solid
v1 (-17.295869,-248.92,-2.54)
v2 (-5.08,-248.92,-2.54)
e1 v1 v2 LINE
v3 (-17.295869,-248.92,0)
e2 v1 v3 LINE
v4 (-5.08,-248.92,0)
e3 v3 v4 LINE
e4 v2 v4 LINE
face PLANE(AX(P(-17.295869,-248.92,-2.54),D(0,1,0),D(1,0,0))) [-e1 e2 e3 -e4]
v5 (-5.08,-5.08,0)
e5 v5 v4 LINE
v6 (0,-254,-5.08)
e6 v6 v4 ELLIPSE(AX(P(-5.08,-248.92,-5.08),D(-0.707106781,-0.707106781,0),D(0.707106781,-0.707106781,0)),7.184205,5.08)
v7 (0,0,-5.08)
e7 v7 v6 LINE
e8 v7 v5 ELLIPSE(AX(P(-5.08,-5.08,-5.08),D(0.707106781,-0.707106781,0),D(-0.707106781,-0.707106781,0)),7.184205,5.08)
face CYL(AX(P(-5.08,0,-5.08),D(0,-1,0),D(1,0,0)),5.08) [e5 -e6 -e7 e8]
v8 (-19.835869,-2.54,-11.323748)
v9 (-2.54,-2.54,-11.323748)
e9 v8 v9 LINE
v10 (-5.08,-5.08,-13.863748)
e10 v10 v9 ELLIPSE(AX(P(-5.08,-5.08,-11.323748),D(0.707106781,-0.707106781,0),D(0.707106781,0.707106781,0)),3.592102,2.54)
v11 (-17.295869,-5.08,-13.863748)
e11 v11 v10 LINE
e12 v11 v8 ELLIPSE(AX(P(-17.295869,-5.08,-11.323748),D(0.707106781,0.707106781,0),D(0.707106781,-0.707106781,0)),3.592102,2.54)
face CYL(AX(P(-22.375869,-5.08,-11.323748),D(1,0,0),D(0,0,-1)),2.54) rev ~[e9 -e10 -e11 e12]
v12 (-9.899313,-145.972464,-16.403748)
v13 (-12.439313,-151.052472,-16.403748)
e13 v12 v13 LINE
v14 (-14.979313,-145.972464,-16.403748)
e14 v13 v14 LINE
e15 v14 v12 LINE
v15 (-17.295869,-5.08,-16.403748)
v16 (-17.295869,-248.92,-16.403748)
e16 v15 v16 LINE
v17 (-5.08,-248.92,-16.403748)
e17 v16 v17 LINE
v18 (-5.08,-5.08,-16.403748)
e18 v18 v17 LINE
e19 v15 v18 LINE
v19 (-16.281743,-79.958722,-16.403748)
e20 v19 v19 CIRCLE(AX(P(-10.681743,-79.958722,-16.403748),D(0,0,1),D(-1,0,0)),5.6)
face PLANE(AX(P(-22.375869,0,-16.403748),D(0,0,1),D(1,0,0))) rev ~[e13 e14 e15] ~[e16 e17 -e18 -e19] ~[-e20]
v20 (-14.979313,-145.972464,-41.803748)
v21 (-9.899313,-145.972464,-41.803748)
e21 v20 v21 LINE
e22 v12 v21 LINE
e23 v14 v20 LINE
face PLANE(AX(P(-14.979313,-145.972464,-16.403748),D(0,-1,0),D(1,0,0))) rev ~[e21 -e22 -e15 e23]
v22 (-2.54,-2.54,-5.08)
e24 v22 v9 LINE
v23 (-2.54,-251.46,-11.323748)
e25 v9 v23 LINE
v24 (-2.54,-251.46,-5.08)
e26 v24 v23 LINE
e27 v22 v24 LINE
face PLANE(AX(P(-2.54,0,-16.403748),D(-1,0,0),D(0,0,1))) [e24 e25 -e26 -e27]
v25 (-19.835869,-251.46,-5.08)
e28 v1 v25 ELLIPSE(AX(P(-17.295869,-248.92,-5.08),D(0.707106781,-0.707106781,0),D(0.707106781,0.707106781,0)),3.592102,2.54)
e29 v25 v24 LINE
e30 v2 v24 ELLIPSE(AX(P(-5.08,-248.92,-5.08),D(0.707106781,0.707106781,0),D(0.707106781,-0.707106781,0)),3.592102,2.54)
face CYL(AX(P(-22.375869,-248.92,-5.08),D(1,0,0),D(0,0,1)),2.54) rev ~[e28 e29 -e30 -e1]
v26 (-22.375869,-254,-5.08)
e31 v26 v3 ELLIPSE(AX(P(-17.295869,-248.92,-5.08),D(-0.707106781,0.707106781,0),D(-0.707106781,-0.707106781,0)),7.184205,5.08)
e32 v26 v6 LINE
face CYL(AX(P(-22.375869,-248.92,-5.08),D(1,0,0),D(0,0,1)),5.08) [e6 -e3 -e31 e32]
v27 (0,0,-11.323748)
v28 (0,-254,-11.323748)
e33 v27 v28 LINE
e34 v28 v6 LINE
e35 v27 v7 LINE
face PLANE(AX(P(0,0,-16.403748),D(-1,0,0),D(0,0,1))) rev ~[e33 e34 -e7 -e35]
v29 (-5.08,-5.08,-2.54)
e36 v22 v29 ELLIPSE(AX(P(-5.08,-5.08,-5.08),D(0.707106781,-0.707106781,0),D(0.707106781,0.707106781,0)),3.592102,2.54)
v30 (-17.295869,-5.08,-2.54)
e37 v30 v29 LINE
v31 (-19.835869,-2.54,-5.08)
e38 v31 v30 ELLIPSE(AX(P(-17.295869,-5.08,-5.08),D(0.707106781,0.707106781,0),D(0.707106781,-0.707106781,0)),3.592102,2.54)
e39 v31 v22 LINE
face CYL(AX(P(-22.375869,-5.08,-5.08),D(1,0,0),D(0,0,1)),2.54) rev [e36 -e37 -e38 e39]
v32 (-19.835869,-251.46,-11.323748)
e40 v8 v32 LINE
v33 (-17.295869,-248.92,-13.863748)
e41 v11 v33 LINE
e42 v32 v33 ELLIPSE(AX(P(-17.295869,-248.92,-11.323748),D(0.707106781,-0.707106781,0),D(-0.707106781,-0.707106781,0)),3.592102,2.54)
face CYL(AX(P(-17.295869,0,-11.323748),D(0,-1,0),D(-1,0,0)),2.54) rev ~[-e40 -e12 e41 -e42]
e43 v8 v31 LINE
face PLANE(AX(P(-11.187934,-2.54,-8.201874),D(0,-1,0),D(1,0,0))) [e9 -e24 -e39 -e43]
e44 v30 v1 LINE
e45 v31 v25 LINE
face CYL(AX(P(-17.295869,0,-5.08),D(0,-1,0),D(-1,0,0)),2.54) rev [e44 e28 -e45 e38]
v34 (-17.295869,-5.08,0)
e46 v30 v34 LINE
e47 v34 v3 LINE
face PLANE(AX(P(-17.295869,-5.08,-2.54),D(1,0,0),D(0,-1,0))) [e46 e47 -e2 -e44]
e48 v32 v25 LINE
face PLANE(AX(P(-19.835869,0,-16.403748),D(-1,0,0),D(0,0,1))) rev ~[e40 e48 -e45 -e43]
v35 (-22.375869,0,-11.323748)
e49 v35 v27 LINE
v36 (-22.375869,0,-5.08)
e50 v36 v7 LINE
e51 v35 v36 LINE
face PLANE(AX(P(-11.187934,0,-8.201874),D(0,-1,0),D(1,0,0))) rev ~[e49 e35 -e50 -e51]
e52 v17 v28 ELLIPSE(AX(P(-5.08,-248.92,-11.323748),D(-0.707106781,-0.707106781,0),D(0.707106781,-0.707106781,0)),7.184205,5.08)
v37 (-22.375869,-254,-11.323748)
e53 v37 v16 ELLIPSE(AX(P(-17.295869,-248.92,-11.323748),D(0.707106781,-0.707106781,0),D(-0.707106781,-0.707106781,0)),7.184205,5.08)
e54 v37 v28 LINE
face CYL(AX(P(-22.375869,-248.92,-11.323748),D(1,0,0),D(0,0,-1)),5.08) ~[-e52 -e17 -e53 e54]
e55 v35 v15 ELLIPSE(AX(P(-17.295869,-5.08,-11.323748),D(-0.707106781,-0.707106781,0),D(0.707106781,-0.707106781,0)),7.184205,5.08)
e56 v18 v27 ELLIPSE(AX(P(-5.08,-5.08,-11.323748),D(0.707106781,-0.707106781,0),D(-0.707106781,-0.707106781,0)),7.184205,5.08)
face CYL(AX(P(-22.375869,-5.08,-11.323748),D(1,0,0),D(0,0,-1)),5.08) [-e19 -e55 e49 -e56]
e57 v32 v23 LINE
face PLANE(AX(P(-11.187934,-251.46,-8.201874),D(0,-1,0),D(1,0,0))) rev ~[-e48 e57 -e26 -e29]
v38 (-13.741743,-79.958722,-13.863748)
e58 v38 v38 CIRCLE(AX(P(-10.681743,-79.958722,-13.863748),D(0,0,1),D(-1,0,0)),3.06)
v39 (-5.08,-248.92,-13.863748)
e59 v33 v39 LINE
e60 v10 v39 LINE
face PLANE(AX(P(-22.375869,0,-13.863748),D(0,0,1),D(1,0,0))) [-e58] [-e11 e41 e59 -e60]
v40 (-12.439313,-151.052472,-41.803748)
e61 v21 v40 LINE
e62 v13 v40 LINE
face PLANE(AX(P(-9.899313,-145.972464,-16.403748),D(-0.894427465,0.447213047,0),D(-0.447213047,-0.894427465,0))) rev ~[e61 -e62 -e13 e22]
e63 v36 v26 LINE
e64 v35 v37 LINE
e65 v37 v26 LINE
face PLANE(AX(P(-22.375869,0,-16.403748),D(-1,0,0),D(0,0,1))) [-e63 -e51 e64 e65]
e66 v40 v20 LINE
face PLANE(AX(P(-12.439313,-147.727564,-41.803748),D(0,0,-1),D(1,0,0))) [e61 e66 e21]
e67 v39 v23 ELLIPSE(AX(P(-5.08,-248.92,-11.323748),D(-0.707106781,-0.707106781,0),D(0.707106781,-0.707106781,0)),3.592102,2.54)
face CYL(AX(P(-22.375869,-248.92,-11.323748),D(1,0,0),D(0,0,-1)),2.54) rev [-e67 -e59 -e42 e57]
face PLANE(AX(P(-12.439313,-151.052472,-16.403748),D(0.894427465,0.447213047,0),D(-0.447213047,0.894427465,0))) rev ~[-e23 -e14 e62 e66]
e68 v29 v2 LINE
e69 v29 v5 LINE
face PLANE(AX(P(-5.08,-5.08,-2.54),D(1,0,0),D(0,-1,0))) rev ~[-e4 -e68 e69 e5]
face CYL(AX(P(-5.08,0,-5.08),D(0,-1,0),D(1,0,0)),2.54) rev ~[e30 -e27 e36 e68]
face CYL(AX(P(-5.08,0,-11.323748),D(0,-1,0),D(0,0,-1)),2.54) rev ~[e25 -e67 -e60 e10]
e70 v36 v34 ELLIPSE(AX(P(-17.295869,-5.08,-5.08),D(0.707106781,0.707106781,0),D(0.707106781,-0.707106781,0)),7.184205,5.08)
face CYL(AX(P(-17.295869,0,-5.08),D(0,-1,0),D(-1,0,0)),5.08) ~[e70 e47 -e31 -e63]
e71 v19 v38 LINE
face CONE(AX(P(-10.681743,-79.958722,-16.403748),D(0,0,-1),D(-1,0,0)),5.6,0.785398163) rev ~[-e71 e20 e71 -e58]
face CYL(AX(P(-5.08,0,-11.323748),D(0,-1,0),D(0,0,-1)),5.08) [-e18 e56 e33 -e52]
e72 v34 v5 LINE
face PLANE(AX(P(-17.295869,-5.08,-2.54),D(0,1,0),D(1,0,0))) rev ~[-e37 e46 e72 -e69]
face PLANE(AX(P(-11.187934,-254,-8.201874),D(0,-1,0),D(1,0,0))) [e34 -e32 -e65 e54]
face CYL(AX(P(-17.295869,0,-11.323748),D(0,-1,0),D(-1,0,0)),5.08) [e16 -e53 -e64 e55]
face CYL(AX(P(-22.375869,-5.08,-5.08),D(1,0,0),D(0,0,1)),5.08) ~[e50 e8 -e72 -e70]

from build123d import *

# Parameters (mm, degrees)
F0_W           = 22.3758686334
F0_H           = 16.4037477225
F1_DEPTH       = 254
F2_R           = 5.08
F3_T           = -2.54
F5_DEPTH       = 25.4
F7_D           = 5.5
F7_CSINK_D     = 11.2
F7_CSINK_ANGLE = 90


# Not quite as in the source:
# - a shell that OpenCascade refuses in one call is made with other operations: the cavity is built on its own and cut out


with BuildPart() as f1:
    # F0 (on Front) → F1 (new body)
    with BuildSketch(Plane.XZ):
        with Locations((-11.1879343167, -8.2018738613)):
            Rectangle(F0_W, F0_H)
    extrude(amount=F1_DEPTH)

    # F2
    f2_edges = [f1.edges().sort_by_distance(p)[0] for p in [
        (0, -127, 0),
        (-22.375869, -127, 0),
        (-11.187934, 0, 0),
        (-11.187934, -254, 0),
        (-22.375869, -127, -16.403748),
        (0, -127, -16.403748),
        (-11.187934, 0, -16.403748),
        (-11.187934, -254, -16.403748),
    ]]
    fillet(f2_edges, radius=F2_R)

    # F3: a shell. OpenCascade refuses it in one call, so the cavity is built on its own and cut out:
    # the body offset inwards by the wall thickness, plus a prism from it out through each open face.
    f3_core = offset(f1.part, amount=F3_T, mode=Mode.PRIVATE)
    f3_exits = [f3_core.faces().sort_by_distance(p)[0] for p in [
        (-11.187934, -127, -2.54),
    ]]
    add(f3_core, mode=Mode.SUBTRACT)
    extrude(f3_exits, amount=-F3_T, mode=Mode.SUBTRACT)

    # F4 (on face) → F5 (join)
    with BuildSketch(Plane(origin=(0, 0, -16.4037477225), x_dir=(1, 0, 0), z_dir=(0, 0, -1))):
        Polygon((-14.9793126683, 145.9724638483), (-12.4393126683, 145.9724638483), (-9.8993126683, 145.9724638483), (-12.4393126683, 151.0524716356), align=None)
    extrude(amount=F5_DEPTH)

    # F7 (through all)
    with Locations(Plane(origin=(0, 0, -16.4037477225), x_dir=(1, 0, 0), z_dir=(0, 0, -1))):
        with Locations((-10.6817428023, 79.9587219954)):
            CounterSinkHole(F7_D / 2, F7_CSINK_D / 2, counter_sink_angle=F7_CSINK_ANGLE)


solid = f1.part
